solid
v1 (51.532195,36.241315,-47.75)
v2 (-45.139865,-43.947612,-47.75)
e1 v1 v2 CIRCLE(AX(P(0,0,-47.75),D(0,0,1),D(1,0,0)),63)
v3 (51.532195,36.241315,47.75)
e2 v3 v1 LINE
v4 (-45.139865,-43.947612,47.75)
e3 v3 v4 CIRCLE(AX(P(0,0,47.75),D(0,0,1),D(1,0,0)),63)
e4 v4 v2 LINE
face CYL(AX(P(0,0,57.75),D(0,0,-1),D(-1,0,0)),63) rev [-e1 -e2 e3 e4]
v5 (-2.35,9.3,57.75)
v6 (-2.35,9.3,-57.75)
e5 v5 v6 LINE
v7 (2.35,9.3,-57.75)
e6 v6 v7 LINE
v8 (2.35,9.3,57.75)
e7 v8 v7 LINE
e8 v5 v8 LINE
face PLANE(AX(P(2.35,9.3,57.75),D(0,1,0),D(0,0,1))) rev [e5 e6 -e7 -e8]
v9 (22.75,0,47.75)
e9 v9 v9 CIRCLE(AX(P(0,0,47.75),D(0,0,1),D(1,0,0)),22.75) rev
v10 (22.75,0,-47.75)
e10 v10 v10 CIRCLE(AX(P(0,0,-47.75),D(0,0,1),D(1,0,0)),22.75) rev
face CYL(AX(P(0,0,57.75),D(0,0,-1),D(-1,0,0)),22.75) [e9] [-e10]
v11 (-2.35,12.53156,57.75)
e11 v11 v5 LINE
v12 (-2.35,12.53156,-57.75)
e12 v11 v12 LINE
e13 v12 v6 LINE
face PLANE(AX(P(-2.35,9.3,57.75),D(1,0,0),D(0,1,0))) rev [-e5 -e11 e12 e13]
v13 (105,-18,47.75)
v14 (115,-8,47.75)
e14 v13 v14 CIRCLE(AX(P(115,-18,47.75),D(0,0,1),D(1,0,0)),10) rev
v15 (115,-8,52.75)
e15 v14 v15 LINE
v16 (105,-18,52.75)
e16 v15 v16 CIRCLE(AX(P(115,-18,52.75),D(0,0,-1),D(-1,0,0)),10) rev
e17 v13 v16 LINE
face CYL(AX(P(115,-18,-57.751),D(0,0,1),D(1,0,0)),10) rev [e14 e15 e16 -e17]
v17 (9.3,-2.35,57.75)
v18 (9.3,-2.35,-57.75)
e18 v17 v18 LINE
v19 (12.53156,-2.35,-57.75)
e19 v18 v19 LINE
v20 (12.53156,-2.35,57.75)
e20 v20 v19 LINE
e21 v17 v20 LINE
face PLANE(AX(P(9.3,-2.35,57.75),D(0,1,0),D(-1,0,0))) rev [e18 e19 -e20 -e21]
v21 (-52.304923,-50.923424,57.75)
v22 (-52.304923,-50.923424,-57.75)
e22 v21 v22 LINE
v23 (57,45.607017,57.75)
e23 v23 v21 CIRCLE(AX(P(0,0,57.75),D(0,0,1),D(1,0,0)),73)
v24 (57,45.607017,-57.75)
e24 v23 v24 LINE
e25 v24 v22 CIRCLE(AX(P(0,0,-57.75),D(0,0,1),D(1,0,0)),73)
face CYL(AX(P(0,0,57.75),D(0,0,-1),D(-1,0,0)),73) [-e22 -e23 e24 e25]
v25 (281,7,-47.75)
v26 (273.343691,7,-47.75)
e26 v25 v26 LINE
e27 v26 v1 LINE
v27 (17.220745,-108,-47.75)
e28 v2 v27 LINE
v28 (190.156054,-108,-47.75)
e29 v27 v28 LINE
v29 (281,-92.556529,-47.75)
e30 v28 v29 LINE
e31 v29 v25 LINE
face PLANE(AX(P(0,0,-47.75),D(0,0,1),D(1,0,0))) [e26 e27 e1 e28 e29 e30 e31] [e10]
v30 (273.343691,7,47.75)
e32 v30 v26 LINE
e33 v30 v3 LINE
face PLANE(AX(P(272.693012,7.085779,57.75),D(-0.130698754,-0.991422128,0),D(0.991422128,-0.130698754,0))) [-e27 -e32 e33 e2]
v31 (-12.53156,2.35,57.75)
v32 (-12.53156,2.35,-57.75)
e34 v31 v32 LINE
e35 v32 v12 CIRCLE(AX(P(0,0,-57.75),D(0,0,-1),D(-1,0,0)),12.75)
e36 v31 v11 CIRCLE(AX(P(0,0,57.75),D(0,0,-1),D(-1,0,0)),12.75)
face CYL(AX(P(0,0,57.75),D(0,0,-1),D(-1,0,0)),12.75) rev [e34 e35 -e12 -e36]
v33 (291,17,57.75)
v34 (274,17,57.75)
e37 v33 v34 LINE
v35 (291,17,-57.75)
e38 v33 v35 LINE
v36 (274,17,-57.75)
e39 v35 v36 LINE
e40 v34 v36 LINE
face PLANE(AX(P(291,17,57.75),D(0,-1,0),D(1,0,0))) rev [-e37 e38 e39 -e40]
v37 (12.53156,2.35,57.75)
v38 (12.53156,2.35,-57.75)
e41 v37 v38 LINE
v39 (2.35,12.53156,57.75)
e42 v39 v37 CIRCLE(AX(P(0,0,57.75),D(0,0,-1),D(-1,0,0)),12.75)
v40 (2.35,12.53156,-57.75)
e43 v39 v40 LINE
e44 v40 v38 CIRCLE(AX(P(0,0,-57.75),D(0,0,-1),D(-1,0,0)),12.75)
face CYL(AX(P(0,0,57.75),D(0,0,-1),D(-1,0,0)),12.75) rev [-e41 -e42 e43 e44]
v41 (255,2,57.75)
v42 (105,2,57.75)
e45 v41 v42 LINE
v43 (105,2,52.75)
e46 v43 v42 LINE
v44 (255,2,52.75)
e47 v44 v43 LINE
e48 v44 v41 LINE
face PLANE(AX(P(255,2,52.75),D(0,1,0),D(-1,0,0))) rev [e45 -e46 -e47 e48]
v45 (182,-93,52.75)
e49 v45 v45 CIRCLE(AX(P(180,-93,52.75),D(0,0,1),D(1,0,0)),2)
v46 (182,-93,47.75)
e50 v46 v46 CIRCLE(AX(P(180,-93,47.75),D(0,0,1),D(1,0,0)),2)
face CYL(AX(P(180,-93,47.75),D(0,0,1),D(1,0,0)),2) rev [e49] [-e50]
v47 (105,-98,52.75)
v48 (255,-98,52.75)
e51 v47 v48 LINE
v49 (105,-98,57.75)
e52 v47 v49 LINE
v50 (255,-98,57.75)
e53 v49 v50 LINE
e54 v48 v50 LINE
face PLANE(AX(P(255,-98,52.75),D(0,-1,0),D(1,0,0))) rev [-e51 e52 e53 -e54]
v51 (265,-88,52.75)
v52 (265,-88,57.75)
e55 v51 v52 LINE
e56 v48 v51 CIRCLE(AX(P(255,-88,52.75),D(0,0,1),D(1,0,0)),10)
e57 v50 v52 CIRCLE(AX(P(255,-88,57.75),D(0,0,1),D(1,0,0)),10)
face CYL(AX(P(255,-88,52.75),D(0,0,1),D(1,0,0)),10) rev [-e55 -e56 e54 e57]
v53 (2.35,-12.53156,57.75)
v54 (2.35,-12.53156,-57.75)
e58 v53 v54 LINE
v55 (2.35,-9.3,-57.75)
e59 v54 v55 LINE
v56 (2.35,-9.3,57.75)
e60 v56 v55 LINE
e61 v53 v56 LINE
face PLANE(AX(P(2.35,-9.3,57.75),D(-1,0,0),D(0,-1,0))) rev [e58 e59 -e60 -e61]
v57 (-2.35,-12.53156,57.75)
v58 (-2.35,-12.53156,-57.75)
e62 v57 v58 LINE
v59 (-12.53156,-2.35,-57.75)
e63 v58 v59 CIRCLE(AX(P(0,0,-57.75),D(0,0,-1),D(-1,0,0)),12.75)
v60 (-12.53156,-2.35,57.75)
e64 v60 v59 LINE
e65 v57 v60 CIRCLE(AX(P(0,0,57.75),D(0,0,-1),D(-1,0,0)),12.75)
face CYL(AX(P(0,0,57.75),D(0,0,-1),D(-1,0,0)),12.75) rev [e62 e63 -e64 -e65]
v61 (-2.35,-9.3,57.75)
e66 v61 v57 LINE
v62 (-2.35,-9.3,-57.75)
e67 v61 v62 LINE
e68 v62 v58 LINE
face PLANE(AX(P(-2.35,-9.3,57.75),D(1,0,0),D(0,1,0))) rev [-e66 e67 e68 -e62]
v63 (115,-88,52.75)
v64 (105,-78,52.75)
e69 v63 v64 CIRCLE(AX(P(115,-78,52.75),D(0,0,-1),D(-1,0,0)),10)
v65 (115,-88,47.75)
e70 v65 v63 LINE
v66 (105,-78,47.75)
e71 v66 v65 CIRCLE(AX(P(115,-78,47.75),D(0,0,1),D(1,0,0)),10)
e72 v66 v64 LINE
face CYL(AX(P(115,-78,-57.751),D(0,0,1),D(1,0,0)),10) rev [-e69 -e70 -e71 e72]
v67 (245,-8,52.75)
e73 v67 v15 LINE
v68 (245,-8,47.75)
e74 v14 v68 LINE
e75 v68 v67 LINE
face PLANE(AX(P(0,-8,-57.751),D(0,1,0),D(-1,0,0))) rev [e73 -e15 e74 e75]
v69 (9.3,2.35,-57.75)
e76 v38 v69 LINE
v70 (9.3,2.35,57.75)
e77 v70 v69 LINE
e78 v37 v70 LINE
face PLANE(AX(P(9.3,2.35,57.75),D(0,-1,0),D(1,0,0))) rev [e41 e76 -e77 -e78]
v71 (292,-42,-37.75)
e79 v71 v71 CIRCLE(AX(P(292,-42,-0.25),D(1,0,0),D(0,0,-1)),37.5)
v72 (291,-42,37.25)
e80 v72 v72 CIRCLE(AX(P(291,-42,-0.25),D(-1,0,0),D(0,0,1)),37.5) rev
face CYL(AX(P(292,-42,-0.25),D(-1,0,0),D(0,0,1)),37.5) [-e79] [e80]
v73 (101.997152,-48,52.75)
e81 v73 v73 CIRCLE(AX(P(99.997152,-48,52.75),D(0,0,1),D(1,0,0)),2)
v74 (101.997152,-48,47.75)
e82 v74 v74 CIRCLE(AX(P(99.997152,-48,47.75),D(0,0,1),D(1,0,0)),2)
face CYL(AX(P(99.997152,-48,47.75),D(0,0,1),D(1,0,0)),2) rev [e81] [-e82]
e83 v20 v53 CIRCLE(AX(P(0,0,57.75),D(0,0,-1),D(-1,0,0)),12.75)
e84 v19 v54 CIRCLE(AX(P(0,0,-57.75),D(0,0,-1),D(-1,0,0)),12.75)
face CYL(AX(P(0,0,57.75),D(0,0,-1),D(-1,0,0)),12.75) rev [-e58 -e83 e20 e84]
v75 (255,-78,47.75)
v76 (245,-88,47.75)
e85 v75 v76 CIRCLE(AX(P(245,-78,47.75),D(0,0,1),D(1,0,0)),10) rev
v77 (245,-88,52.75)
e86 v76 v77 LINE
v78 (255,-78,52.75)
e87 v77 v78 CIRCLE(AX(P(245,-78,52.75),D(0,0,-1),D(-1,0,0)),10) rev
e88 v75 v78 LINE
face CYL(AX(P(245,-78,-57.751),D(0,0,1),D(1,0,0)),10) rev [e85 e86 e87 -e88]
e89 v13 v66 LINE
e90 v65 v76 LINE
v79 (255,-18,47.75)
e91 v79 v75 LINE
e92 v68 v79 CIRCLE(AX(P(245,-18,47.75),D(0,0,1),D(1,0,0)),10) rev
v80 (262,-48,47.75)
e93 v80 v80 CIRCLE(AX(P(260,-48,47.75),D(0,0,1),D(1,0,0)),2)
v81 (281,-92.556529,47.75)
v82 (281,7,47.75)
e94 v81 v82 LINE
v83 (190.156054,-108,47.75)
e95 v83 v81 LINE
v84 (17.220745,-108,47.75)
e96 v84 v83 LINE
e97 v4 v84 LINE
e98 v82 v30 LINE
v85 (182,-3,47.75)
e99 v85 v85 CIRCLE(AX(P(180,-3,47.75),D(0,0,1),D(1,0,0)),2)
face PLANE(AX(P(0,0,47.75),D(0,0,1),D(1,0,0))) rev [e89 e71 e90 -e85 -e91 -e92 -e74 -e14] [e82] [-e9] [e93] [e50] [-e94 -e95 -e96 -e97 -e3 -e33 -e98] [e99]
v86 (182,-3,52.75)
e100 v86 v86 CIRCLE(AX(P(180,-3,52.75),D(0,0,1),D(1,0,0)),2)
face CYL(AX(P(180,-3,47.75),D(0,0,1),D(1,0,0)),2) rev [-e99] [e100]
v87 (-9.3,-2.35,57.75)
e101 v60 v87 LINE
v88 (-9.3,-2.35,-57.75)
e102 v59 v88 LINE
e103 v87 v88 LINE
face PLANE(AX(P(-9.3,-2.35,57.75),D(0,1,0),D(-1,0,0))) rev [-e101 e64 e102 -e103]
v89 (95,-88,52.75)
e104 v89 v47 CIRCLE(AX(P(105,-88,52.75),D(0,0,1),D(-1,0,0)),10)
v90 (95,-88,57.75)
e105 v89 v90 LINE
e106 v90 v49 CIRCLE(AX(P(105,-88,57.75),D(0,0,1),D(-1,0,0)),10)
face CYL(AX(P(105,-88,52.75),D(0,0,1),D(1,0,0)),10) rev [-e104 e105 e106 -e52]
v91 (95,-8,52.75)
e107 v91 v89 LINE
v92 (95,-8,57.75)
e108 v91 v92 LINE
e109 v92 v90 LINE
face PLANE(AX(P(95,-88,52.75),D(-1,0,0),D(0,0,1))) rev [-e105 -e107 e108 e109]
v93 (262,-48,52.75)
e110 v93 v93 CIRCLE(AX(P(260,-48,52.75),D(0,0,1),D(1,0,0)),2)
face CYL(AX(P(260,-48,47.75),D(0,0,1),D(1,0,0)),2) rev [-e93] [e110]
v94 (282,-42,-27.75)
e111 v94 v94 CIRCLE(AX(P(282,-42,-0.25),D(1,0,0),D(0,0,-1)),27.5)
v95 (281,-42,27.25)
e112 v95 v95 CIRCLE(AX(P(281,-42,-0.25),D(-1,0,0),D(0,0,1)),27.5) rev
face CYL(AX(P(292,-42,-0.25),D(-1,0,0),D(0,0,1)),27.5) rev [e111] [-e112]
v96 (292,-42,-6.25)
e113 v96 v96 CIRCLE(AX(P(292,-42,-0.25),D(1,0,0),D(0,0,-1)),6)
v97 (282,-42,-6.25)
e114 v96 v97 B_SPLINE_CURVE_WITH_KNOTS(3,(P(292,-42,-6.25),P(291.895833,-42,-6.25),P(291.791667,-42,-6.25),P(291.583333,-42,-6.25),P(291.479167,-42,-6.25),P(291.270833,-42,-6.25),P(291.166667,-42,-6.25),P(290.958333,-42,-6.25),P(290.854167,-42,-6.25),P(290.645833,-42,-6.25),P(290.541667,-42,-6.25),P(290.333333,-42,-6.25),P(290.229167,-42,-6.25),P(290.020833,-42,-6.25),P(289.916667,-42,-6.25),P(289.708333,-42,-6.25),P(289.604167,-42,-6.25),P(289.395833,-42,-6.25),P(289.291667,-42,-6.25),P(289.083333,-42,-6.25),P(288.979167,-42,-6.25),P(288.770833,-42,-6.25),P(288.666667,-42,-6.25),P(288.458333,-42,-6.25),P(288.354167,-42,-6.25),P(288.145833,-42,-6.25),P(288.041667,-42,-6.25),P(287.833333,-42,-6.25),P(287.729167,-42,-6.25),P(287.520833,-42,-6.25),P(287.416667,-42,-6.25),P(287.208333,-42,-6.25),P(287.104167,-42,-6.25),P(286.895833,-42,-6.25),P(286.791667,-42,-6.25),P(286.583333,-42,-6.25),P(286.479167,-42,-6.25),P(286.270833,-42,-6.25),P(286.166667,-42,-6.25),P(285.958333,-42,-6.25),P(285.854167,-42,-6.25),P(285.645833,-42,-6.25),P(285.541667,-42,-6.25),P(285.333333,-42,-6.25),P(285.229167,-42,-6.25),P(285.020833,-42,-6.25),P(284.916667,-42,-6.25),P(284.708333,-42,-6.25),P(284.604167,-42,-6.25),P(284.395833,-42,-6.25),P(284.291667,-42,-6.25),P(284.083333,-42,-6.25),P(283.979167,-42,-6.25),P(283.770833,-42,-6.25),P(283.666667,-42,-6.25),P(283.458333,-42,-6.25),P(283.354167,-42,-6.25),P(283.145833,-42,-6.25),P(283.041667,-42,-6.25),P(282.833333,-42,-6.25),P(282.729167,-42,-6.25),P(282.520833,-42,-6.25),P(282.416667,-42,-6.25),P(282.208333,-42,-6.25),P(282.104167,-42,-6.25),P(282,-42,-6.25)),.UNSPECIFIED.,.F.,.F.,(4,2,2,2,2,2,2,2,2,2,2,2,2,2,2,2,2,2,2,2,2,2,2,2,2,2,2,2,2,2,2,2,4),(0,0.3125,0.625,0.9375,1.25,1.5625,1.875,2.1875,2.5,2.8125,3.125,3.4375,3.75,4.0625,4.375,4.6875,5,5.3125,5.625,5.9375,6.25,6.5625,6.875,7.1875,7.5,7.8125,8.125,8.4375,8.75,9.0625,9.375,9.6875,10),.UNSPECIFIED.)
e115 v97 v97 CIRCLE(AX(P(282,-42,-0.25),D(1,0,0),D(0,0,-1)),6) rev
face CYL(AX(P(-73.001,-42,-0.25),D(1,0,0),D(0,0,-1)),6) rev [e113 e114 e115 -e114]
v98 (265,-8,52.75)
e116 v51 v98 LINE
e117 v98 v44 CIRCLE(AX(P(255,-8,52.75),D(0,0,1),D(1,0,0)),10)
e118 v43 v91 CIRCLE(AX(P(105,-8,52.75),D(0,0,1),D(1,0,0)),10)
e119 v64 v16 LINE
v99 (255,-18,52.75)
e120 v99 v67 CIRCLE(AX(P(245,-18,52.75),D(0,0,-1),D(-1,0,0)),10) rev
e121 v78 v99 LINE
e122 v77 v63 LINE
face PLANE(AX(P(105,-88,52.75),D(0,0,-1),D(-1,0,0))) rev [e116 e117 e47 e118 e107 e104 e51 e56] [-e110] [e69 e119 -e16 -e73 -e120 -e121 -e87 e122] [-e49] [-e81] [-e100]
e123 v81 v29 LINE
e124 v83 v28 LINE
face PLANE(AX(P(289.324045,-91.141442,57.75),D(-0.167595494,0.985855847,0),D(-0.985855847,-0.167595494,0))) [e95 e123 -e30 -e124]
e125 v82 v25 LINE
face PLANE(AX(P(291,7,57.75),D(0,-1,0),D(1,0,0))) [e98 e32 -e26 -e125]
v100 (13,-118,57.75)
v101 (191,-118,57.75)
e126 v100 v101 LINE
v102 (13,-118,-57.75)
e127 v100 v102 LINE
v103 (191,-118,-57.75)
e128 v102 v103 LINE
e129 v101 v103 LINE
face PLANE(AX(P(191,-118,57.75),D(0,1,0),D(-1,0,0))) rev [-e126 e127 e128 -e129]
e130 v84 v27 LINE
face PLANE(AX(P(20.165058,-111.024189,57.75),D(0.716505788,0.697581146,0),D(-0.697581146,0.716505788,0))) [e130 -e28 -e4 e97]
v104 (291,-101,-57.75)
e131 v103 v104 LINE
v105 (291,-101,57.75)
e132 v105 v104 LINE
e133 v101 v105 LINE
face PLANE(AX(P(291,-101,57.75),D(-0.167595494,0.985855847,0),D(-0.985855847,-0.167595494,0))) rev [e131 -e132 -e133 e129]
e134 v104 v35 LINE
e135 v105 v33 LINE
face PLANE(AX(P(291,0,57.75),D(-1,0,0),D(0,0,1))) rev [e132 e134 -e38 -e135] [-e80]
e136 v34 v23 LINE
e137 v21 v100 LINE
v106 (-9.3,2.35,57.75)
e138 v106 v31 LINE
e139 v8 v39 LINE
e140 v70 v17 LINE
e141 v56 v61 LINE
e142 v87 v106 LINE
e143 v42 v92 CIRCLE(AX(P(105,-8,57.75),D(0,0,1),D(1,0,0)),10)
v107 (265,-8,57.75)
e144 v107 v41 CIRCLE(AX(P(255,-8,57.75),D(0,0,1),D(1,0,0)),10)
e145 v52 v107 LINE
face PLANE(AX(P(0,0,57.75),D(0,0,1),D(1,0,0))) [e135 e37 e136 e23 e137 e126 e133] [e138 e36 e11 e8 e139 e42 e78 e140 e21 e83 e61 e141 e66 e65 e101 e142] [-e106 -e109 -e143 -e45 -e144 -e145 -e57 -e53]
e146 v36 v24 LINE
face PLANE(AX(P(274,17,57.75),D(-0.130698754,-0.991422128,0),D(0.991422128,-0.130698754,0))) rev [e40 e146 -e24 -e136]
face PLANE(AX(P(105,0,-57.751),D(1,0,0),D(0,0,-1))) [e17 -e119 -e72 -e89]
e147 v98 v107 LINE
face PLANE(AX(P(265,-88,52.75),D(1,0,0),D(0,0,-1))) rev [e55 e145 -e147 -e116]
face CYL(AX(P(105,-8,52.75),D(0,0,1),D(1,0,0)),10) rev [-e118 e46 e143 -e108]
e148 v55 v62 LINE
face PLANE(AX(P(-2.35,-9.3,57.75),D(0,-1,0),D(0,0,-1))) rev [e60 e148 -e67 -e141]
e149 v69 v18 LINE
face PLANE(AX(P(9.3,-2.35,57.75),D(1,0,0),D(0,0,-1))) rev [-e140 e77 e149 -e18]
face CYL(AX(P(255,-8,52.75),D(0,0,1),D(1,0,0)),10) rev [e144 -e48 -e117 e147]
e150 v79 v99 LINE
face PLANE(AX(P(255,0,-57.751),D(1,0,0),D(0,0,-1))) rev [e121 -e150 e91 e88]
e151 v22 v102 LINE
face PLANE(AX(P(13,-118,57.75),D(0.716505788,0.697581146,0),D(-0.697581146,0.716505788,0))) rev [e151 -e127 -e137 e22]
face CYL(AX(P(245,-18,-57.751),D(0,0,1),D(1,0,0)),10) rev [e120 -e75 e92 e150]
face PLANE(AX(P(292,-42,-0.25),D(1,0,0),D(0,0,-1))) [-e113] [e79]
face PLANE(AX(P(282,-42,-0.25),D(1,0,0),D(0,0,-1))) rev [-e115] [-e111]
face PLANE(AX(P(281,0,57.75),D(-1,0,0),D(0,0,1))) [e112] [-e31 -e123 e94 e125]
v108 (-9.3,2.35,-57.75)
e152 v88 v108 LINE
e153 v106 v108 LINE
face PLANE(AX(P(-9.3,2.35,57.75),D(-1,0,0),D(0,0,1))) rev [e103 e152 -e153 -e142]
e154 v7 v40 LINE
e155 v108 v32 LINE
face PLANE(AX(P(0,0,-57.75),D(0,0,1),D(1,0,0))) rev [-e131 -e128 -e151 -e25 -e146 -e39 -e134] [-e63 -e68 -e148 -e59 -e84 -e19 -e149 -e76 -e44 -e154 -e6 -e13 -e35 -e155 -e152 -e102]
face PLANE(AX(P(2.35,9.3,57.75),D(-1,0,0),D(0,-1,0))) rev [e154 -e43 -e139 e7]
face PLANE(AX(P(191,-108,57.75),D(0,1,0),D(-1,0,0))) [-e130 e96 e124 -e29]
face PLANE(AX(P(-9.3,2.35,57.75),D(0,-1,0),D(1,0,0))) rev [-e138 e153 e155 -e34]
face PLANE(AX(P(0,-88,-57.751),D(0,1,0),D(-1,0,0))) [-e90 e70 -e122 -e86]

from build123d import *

# Parameters (mm, degrees)
RESSALTO_EXTRUS_O1_DEPTH = 57.75
ESBO_O2_R                = 37.5
RESSALTO_EXTRUS_O2_DEPTH = 1
CORTE_EXTRUS_O1_DEPTH    = 336.452306595
CASCA1_START             = -47.75
CASCA1_OUTLINE_R         = 22.75
CASCA1_DEPTH             = 95.5
CASCA1_START_2           = 281
CASCA1_2_OUTLINE_R       = 27.5
CASCA1_2_DEPTH           = 1
CORTE_EXTRUS_O2_REACH    = 389.923
ESBO_O6_R                = 6
CORTE_EXTRUS_O3_REACH    = 337.452
CORTE_EXTRUS_O4_DEPTH    = 5
ESBO_O9_R                = 2
CORTE_EXTRUS_O5_DEPTH    = 5


with BuildPart() as part:
    # Esboço1 → Ressalto-extrusão1 (new, symmetric)
    with BuildSketch(Plane.XY):
        with BuildLine():
            Line((291, 0), (291, 17))
            Line((291, 17), (274, 17))
            Line((274, 17), (57, 45.607017004))
            ThreePointArc((57, 45.607017004), (-48.32227677, 54.71706834), (-52.304922539, -50.92342367))
            Line((-52.304922539, -50.92342367), (13, -118))
            Line((13, -118), (191, -118))
            Line((191, -118), (291, -101))
            Line((291, -101), (291, 0))
        make_face()
    extrude(amount=RESSALTO_EXTRUS_O1_DEPTH, both=True)

    # Esboço2 → Ressalto-extrusão2 (add, symmetric)
    with BuildSketch(Plane(origin=(291, 0, 0), x_dir=(0, 0, -1), z_dir=(1, 0, 0))):
        with Locations(Location((0.25, -42, 0), (0, 0, 180))):
            Circle(ESBO_O2_R)
    extrude(amount=RESSALTO_EXTRUS_O2_DEPTH, both=True)

    # Esboço4 → Corte-extrusão1 (cut, through all)
    with BuildSketch(Plane(origin=(0, 0, -57.75), x_dir=(-1, 0, 0), z_dir=(0, 0, -1))):
        with BuildLine():
            Line((-2.35, 9.3), (2.35, 9.3))
            Line((2.35, 9.3), (2.35, 12.531560158))
            ThreePointArc((2.35, 12.531560158), (9.01561146, 9.01561146), (12.531560158, 2.35))
            Line((12.531560158, 2.35), (9.3, 2.35))
            Line((9.3, 2.35), (9.3, -2.35))
            Line((9.3, -2.35), (12.531560158, -2.35))
            ThreePointArc((12.531560158, -2.35), (9.01561146, -9.01561146), (2.35, -12.531560158))
            Line((2.35, -12.531560158), (2.35, -9.3))
            Line((2.35, -9.3), (-2.35, -9.3))
            Line((-2.35, -9.3), (-2.35, -12.531560158))
            ThreePointArc((-2.35, -12.531560158), (-9.01561146, -9.01561146), (-12.531560158, -2.35))
            Line((-12.531560158, -2.35), (-9.3, -2.35))
            Line((-9.3, -2.35), (-9.3, 2.35))
            Line((-9.3, 2.35), (-12.531560158, 2.35))
            ThreePointArc((-12.531560158, 2.35), (-9.01561146, 9.01561146), (-2.35, 12.531560158))
            Line((-2.35, 12.531560158), (-2.35, 9.3))
        make_face()
    extrude(amount=-CORTE_EXTRUS_O1_DEPTH, mode=Mode.SUBTRACT)

    # Casca1: read off the stored shape, not the designer's step
    # Casca1 outline → Casca1 (cut)
    with BuildSketch(Plane.XY.offset(CASCA1_START)):
        with BuildLine():
            ThreePointArc((51.532195013, 36.241314506), (-40.221654164, 48.489365187), (-45.139864657, -43.947612208))
            Line((-45.139864657, -43.947612208), (17.22074544, -108))
            Line((17.22074544, -108), (190.15605408, -108))
            Line((190.15605408, -108), (281, -92.556529194))
            Line((281, -92.556529194), (281, 7))
            Line((281, 7), (273.343691363, 7))
            Line((273.343691363, 7), (51.532195013, 36.241314506))
        make_face()
        Circle(CASCA1_OUTLINE_R, mode=Mode.SUBTRACT)
    extrude(amount=CASCA1_DEPTH, mode=Mode.SUBTRACT)

    # Casca1 2 outline → Casca1 2 (cut)
    with BuildSketch(Plane.YZ.offset(CASCA1_START_2)):
        with Locations((-42, -0.25)):
            Circle(CASCA1_2_OUTLINE_R)
    extrude(amount=CASCA1_2_DEPTH, mode=Mode.SUBTRACT)

    # Esboço6 → Corte-extrusão2 (cut, up to next)
    with BuildSketch(Plane(origin=(292, 0, 0), x_dir=(0, 0, -1), z_dir=(1, 0, 0)), mode=Mode.PRIVATE) as corte_extrus_o2_sk1:
        with Locations((0.25, -42)):
            Circle(ESBO_O6_R)
    corte_extrus_o2_tool1 = extrude(corte_extrus_o2_sk1.sketch, amount=-CORTE_EXTRUS_O2_REACH, mode=Mode.PRIVATE) & part.part
    add(corte_extrus_o2_tool1.solids().sort_by_distance((292, -42, -0.25))[0], mode=Mode.SUBTRACT)

    # Esboço7 → Corte-extrusão3 (cut, up to next)
    with BuildSketch(Plane.XY.offset(57.75), mode=Mode.PRIVATE) as corte_extrus_o3_sk1:
        with BuildLine():
            Line((245, -88), (115, -88))
            ThreePointArc((115, -88), (107.928932188, -85.071067812), (105, -78))
            Line((105, -78), (105, -18))
            ThreePointArc((105, -18), (107.928932188, -10.928932188), (115, -8))
            Line((115, -8), (245, -8))
            ThreePointArc((245, -8), (252.071067812, -10.928932188), (255, -18))
            Line((255, -18), (255, -78))
            ThreePointArc((255, -78), (252.071067812, -85.071067812), (245, -88))
        make_face()
    corte_extrus_o3_tool1 = extrude(corte_extrus_o3_sk1.sketch, amount=-CORTE_EXTRUS_O3_REACH, mode=Mode.PRIVATE) & part.part
    add(corte_extrus_o3_tool1.solids().sort_by_distance((180, -48, 57.75))[0], mode=Mode.SUBTRACT)

    # Esboço8 → Corte-extrusão4 (cut)
    with BuildSketch(Plane.XY.offset(57.75)):
        with BuildLine():
            Line((255, -98), (105, -98))
            ThreePointArc((105, -98), (97.928932188, -95.071067812), (95, -88))
            Line((95, -88), (95, -8))
            ThreePointArc((95, -8), (97.928932188, -0.928932188), (105, 2))
            Line((105, 2), (255, 2))
            ThreePointArc((255, 2), (262.071067812, -0.928932188), (265, -8))
            Line((265, -8), (265, -88))
            ThreePointArc((265, -88), (262.071067812, -95.071067812), (255, -98))
        make_face()
    extrude(amount=-CORTE_EXTRUS_O4_DEPTH, mode=Mode.SUBTRACT)

    # Esboço9 → Corte-extrusão5 (cut)
    with BuildSketch(Plane.XY.offset(52.75)):
        with Locations((180, -3)):
            Circle(ESBO_O9_R)
        with Locations((260, -48)):
            Circle(ESBO_O9_R)
        with Locations((180, -93)):
            Circle(ESBO_O9_R)
        with Locations((99.997152321, -48)):
            Circle(ESBO_O9_R)
    extrude(amount=-CORTE_EXTRUS_O5_DEPTH, mode=Mode.SUBTRACT)


solid = part.part
